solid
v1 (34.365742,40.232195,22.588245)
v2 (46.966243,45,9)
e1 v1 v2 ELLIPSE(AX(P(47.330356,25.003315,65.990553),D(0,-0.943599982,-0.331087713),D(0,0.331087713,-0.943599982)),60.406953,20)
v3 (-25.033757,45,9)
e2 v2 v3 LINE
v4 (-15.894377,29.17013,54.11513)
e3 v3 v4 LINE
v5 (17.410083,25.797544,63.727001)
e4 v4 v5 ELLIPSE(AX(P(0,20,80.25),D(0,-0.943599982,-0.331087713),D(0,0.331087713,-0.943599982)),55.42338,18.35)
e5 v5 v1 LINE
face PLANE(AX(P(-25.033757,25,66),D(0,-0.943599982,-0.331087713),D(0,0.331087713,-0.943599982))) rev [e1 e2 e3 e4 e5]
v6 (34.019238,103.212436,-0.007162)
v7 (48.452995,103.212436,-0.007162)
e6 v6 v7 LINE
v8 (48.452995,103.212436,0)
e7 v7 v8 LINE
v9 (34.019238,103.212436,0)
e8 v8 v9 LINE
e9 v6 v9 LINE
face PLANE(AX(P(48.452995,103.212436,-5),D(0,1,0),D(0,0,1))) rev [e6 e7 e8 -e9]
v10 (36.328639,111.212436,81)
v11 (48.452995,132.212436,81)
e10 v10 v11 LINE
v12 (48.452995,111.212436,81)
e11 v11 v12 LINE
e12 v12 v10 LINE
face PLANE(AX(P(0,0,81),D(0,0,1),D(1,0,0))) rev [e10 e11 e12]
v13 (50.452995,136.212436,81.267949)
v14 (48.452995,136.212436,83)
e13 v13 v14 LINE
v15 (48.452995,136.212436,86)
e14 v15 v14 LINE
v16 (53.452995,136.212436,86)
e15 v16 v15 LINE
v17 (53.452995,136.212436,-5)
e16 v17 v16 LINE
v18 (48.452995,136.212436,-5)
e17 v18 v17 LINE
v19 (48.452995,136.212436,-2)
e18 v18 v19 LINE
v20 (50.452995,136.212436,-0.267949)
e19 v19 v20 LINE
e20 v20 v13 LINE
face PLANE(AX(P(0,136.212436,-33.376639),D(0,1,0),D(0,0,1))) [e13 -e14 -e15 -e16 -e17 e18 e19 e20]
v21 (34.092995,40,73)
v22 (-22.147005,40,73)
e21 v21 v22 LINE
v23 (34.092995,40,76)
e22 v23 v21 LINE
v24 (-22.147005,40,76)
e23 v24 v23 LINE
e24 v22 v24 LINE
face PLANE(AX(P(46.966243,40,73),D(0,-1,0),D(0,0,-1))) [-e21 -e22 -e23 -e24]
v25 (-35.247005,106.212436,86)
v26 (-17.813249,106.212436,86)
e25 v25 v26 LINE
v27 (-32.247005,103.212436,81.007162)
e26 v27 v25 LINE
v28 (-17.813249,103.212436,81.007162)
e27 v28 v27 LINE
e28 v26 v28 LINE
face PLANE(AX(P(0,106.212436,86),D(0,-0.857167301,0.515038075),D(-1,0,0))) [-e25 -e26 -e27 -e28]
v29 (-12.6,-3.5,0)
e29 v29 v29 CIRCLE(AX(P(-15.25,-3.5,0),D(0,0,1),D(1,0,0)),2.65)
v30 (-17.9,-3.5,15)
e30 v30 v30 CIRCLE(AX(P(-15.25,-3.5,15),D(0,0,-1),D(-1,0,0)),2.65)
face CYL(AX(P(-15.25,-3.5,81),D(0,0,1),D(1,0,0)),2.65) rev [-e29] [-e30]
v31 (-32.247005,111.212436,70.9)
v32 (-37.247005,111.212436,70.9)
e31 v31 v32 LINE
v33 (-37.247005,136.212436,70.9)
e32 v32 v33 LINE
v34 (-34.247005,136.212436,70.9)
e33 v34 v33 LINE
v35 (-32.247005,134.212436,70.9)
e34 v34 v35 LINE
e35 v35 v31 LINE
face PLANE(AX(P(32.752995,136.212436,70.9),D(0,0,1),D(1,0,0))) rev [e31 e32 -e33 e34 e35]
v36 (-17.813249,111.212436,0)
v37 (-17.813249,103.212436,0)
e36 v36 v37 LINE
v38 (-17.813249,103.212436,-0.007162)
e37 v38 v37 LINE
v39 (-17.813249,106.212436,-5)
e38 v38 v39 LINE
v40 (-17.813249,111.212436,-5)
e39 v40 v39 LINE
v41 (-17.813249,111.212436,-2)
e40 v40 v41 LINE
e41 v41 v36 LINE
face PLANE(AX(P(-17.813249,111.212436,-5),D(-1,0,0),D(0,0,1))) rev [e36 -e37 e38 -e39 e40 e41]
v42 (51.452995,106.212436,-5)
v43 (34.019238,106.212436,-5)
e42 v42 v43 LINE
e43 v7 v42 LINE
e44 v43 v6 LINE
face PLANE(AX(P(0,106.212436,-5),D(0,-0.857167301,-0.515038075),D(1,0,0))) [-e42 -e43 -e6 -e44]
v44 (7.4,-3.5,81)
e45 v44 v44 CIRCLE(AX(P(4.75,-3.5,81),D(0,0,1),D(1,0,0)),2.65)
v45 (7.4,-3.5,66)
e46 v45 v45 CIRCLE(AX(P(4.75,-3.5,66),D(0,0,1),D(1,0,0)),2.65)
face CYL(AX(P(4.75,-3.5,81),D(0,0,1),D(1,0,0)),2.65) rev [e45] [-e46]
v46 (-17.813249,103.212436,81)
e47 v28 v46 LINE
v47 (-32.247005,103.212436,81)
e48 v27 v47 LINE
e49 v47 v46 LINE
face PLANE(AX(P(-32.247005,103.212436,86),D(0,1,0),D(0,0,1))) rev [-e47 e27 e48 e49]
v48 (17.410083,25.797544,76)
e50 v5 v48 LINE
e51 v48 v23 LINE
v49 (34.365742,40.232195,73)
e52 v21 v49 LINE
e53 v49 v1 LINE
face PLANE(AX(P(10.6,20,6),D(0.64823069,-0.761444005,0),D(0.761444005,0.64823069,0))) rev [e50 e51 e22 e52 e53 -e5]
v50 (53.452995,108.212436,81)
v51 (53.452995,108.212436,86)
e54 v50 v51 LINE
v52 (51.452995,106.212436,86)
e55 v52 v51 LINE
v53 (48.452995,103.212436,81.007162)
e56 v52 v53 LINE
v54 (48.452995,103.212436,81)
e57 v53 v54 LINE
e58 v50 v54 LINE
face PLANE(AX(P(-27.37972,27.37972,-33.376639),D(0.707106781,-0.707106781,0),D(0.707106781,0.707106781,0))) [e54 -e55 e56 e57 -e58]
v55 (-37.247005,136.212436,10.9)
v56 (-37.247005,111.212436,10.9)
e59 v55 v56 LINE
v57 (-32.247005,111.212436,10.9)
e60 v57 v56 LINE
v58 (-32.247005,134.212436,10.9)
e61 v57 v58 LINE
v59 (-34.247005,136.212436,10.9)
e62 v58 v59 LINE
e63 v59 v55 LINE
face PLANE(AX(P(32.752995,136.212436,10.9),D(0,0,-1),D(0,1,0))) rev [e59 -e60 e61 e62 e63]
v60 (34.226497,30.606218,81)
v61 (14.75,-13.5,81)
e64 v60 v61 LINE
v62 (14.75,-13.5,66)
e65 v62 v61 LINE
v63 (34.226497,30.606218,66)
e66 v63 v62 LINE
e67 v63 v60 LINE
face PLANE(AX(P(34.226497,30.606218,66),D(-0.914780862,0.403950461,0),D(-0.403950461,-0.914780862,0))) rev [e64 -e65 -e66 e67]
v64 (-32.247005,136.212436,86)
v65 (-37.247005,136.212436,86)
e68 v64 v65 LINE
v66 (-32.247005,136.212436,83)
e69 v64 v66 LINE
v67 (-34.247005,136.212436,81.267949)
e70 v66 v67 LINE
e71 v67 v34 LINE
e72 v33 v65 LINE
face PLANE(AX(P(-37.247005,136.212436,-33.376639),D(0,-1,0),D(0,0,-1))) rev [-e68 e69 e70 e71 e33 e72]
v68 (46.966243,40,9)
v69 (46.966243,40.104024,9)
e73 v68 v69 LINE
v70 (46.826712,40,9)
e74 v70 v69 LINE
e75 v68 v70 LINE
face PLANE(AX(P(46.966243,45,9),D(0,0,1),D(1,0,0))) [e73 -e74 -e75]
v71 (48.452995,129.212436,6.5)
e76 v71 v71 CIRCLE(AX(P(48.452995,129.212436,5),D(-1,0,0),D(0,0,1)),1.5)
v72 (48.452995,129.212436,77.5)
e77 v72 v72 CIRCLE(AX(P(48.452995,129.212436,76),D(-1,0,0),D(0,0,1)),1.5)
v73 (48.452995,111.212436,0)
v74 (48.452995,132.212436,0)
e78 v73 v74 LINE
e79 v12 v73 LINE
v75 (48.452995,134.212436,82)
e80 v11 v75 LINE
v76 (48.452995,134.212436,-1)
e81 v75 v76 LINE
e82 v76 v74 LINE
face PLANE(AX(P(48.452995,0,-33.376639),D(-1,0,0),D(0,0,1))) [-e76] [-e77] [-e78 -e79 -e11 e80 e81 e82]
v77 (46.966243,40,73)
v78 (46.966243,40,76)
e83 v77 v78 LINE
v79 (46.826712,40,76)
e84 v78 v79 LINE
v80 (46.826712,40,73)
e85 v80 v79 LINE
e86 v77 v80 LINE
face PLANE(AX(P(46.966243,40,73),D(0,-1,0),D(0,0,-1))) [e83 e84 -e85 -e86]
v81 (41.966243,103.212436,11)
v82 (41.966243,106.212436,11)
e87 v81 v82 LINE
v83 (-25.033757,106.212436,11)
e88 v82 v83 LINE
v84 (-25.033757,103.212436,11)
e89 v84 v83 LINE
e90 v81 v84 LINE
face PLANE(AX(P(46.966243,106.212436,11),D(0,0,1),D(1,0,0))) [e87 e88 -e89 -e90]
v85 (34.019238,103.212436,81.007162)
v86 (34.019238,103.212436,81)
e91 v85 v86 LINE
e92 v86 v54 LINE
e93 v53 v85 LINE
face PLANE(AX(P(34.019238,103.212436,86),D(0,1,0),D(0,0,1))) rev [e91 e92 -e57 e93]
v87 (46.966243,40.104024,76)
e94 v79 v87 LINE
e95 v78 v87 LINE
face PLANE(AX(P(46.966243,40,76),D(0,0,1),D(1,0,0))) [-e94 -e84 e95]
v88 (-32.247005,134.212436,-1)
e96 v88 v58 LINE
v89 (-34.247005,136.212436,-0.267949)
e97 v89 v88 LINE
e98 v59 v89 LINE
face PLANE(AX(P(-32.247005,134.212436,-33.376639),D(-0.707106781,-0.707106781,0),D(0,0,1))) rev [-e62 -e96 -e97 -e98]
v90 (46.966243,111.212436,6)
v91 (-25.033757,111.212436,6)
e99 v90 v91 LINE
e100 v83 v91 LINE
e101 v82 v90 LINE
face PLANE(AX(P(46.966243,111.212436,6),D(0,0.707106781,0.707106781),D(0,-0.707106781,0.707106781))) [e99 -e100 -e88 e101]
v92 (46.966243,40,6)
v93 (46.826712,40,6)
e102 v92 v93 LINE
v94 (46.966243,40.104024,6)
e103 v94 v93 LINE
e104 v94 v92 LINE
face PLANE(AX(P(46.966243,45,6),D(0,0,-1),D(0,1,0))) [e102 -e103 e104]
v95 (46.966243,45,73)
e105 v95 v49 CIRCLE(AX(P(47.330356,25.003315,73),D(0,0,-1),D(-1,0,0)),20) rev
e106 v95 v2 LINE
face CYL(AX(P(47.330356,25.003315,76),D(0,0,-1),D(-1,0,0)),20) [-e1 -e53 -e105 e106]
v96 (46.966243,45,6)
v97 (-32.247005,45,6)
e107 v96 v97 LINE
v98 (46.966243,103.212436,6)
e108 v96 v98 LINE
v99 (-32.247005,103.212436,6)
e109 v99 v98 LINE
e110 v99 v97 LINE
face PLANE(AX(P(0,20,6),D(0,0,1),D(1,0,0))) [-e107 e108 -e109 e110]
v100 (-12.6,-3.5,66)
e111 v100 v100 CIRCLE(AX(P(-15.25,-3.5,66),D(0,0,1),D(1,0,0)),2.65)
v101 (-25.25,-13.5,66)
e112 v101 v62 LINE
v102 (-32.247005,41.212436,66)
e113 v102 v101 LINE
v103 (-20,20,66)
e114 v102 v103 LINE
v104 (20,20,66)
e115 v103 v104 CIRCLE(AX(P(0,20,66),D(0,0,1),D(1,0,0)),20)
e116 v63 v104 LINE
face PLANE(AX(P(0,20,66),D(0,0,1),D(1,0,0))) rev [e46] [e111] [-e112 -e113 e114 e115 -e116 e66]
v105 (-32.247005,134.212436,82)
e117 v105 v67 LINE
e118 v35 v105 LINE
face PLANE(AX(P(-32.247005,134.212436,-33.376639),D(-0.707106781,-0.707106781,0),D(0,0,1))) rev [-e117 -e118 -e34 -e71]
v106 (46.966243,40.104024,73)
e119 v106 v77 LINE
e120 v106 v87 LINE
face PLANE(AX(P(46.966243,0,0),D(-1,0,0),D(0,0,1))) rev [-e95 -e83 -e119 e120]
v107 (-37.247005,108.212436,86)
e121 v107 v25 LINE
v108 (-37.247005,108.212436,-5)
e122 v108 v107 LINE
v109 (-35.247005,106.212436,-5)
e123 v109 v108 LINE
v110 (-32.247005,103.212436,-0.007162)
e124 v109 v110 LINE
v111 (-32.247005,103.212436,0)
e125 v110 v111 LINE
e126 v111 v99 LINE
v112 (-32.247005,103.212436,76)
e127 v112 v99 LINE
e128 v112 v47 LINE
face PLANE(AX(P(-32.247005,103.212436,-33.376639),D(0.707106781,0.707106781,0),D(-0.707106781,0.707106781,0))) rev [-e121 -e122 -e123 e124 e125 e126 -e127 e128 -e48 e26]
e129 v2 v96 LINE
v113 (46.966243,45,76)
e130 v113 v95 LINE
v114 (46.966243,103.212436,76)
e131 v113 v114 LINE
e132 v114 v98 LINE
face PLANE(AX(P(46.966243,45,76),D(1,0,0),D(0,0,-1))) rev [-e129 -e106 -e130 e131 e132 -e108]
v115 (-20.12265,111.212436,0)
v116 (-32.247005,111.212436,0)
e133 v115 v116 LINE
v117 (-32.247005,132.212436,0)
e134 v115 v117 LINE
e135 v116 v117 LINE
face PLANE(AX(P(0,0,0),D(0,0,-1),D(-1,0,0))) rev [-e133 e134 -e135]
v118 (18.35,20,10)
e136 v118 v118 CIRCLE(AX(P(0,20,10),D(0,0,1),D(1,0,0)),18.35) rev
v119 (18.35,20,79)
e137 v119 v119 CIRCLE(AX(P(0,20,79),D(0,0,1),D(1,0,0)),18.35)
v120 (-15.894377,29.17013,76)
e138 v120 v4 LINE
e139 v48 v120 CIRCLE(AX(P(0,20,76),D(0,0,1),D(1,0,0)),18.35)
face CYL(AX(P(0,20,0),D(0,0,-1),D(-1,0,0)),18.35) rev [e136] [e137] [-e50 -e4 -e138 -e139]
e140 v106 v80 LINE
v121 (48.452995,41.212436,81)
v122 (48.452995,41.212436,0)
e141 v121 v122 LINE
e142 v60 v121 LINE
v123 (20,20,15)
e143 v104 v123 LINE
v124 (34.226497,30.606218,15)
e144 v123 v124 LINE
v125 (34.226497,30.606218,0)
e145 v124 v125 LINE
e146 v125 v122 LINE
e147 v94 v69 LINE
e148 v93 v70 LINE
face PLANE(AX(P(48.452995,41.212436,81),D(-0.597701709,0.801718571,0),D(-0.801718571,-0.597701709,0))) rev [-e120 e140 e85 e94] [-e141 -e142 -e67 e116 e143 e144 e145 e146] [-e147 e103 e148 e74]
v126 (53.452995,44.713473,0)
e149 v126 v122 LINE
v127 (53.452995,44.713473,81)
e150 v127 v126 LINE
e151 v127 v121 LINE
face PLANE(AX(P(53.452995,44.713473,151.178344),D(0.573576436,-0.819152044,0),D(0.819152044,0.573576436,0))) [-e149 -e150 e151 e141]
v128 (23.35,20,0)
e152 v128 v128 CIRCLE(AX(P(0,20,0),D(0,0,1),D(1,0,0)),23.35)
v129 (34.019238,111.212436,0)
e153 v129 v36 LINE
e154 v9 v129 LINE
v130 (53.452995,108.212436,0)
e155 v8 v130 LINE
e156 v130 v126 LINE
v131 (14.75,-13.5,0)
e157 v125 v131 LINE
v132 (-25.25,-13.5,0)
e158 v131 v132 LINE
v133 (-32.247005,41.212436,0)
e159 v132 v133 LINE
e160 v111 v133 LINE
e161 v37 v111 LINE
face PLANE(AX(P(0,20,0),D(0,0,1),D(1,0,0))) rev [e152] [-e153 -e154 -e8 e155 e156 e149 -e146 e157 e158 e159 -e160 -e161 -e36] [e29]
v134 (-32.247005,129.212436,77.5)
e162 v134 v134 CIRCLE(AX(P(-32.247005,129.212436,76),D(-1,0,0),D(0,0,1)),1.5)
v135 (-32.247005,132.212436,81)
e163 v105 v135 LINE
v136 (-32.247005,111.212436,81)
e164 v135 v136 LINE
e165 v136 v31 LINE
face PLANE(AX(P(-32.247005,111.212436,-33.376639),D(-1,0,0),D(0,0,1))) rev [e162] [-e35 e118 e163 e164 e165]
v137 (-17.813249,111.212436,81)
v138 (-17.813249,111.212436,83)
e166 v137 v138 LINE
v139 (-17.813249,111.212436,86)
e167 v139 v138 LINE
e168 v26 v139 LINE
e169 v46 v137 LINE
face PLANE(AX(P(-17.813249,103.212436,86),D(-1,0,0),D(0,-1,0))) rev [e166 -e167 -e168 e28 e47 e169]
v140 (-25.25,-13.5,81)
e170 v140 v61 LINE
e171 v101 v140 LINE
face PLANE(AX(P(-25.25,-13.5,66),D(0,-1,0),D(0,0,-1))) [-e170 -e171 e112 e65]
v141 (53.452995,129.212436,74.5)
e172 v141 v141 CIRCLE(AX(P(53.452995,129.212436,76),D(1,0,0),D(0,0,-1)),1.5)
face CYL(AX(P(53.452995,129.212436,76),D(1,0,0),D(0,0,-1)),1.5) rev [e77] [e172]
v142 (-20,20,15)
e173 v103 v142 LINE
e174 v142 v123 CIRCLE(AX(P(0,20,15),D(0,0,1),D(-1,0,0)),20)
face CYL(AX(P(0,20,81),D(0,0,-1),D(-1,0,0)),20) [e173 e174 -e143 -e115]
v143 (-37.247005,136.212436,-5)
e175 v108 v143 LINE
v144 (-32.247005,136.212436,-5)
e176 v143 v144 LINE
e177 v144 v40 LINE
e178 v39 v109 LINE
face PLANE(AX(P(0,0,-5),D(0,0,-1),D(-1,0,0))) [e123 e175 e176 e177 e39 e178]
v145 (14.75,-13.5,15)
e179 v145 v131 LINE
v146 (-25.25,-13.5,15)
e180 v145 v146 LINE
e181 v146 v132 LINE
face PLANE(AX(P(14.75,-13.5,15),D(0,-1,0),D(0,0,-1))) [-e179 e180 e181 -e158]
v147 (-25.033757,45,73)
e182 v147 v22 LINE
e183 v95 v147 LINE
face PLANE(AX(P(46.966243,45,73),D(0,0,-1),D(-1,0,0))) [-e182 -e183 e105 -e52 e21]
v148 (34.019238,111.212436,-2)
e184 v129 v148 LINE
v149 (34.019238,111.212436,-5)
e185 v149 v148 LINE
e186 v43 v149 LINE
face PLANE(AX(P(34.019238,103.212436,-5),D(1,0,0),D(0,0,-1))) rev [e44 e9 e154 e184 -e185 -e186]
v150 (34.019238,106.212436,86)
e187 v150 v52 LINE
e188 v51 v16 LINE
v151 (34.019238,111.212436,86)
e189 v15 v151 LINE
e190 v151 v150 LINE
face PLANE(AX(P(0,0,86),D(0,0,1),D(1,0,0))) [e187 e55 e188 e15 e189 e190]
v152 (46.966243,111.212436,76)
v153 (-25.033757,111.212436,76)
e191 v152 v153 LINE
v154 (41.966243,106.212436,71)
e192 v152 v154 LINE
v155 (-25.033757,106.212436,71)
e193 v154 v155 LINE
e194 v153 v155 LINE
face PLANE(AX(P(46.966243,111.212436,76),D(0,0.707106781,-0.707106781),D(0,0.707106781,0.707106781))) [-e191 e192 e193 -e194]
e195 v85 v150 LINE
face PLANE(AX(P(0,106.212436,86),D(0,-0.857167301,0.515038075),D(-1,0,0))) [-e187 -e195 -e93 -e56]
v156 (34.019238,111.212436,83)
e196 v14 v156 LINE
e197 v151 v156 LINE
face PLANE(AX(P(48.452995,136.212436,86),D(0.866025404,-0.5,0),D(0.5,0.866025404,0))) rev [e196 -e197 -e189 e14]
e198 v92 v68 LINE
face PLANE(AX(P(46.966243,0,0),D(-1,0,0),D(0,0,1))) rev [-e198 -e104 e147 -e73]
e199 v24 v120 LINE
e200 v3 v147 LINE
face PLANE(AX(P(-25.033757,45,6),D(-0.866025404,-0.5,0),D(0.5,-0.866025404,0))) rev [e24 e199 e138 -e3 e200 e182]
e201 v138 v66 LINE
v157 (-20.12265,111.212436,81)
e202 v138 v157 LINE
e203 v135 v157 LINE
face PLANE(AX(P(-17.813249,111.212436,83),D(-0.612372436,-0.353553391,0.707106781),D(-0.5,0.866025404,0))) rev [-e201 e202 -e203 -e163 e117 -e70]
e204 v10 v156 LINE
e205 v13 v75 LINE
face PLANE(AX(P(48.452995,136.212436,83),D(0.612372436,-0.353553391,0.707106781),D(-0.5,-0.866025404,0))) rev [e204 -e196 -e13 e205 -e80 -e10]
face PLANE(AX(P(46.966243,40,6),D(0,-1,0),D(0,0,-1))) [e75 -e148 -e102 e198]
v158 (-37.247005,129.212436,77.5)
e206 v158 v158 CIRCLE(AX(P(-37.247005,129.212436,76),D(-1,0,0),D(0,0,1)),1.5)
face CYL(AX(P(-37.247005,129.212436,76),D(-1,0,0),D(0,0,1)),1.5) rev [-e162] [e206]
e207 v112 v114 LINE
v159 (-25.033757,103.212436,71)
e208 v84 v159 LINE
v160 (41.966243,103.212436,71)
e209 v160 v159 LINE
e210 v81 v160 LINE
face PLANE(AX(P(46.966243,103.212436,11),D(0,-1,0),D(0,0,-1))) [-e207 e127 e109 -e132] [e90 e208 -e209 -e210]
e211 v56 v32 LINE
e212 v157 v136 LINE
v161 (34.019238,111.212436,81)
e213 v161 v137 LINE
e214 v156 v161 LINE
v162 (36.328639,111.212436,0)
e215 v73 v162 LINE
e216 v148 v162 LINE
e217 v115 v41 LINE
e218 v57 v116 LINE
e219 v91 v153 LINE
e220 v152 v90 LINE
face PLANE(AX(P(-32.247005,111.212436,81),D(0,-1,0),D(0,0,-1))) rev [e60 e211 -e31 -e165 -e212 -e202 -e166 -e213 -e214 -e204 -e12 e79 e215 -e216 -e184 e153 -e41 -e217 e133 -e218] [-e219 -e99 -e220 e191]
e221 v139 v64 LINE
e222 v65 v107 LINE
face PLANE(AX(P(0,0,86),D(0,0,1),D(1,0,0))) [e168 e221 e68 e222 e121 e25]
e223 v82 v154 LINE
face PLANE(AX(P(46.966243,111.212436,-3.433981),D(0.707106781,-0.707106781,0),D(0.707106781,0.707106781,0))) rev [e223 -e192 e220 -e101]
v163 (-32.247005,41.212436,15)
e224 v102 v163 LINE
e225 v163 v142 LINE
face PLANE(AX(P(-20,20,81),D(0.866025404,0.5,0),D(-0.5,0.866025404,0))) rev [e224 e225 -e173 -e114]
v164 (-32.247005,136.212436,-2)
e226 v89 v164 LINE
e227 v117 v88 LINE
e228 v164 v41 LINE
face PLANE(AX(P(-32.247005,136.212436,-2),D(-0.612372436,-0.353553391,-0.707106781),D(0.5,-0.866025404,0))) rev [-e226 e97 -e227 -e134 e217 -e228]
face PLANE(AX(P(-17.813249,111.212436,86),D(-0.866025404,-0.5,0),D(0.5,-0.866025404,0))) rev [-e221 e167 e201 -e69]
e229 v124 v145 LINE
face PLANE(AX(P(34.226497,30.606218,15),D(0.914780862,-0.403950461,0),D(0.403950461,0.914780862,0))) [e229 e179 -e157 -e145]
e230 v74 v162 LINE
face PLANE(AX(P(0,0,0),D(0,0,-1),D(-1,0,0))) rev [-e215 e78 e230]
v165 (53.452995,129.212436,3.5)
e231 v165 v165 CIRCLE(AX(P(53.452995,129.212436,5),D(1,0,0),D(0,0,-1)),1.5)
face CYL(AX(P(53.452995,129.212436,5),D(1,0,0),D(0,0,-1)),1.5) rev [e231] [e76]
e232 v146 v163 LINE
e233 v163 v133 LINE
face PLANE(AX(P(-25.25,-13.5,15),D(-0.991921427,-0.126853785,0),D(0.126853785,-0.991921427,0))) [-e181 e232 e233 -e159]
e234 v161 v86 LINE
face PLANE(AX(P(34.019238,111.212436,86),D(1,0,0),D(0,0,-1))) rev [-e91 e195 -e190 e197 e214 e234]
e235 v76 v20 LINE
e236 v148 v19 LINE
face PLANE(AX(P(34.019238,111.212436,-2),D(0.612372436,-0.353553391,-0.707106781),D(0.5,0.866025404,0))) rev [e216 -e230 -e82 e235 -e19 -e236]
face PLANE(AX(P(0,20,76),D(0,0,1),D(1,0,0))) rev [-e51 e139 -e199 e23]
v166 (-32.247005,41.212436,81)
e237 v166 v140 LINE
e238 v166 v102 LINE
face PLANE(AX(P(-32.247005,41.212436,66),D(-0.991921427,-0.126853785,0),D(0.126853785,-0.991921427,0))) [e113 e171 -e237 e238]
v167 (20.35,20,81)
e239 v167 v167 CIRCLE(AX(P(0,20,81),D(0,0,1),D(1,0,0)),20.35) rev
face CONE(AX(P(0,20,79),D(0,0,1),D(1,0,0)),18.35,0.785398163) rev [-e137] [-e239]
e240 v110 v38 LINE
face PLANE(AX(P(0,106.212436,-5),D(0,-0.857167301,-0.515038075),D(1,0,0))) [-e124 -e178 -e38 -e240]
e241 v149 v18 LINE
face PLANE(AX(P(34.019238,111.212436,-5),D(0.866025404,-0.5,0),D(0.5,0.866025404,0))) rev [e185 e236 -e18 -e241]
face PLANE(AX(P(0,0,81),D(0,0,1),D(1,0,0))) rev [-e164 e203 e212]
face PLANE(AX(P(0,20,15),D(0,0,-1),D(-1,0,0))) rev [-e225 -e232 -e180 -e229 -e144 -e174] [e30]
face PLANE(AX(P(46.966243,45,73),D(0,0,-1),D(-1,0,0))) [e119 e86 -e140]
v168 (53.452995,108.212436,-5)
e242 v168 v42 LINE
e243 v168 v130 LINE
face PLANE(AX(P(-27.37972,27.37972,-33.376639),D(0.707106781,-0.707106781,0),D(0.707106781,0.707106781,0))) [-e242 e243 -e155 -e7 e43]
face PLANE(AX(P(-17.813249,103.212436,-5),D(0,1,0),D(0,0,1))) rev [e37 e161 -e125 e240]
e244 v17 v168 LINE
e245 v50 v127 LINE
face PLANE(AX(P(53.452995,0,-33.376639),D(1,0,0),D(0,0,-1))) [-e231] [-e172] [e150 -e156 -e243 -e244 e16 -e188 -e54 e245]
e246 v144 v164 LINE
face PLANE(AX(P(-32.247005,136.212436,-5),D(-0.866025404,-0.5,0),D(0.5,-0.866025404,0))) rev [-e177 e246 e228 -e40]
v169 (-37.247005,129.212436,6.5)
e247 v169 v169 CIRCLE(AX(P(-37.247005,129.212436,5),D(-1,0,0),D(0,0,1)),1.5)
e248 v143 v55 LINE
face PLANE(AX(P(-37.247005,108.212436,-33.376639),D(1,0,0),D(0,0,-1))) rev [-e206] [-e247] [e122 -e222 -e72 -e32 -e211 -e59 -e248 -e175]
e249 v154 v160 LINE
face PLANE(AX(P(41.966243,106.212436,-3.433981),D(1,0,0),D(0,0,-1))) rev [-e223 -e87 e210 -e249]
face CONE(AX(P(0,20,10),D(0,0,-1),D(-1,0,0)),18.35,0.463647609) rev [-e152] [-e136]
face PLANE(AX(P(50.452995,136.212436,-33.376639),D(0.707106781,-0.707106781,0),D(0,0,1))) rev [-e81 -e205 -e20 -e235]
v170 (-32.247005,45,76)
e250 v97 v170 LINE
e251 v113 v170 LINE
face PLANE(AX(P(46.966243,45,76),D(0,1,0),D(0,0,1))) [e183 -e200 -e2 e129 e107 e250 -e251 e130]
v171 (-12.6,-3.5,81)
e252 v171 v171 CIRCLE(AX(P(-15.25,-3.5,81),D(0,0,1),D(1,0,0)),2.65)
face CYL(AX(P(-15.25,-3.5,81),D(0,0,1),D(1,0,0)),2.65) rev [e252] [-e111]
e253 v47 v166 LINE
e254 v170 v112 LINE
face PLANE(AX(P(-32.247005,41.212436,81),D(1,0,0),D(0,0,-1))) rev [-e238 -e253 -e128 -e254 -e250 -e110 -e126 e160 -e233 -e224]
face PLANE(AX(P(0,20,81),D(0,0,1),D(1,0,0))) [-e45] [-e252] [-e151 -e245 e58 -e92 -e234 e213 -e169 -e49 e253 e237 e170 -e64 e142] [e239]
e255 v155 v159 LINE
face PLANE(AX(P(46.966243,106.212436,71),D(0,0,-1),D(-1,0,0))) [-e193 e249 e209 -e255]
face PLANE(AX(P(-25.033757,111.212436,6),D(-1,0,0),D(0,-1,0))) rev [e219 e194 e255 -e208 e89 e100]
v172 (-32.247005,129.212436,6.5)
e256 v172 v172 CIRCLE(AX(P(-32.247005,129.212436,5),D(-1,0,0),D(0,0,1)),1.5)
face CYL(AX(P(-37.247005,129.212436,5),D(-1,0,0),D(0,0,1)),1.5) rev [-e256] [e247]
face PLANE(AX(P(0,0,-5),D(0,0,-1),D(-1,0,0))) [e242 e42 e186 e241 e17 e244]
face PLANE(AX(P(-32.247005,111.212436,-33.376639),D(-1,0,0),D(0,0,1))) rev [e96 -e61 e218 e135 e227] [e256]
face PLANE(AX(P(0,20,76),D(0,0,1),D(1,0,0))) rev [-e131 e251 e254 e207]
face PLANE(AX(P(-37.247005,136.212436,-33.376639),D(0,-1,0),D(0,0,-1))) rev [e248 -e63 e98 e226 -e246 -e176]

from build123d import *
from OCP.BRepFilletAPI import BRepFilletAPI_MakeChamfer

# Parameters (mm, degrees)
AUFSATZ_LINEAR_AUSTRAGEN1_DEPTH      = 81
SCHNITT_LINEAR_START                 = -5
SCHNITT_LINEAR_AUSTRAGEN1_DEPTH      = 70
AUFSATZ_LINEAR_START                 = -7
SKIZZE7_W                            = 3
SKIZZE7_H                            = 5
AUFSATZ_LINEAR_AUSTRAGEN2_DEPTH      = 72
SCHNITT_LINEAR_AUSTRAGEN2_DEPTH      = 156.38326520426057
AUFSATZ_LINEAR_AUSTRAGEN16_REACH     = 147.866
AUFSATZ_LINEAR_AUSTRAGEN17_DEPTH     = 5
AUFSATZ_LINEAR_AUSTRAGEN18_DEPTH     = 5
F_3_0_3_DURCHMESSER_BOHRUNG1_D       = 3
F_3_0_3_DURCHMESSER_BOHRUNG1_DEPTH   = 5
AUFSATZ_LINEAR_AUSTRAGEN19_DEPTH     = 65
F_21_5_21_5_DURCHMESSER_BOHRUNG1_D   = 36.7
SCHNITT_LINEAR_AUSTRAGEN3_DEPTH      = 167.766454168909
FASE1_SIZE                           = 2
AUFSATZ_LINEAR_AUSTRAGEN20_REACH     = 178.15
FASE3_SIZE                           = 2
FASE4_SIZE                           = 2
AUFSATZ_LINEAR_AUSTRAGEN21_REACH     = 178.15
F_3_0_3_DURCHMESSER_BOHRUNG2_D       = 3
AUFSATZ_LINEAR_START_2               = -15
AUFSATZ_LINEAR_AUSTRAGEN22_DEPTH     = 15
AUFSATZ_LINEAR_AUSTRAGEN23_DEPTH     = 15
FASE5_SIZE                           = 3
FASE5_SIZE2                          = 4.992838447051577
F_5_3_5_3_DURCHMESSER_BOHRUNG1_D     = 5.3
F_5_3_5_3_DURCHMESSER_BOHRUNG2_D     = 5.3
F_5_3_5_3_DURCHMESSER_BOHRUNG2_DEPTH = 15
FASE6_SIZE                           = 2
FASE7_SIZE                           = 5
FASE7_SIZE2                          = 10
AUFSATZ_LINEAR_AUSTRAGEN24_DEPTH     = 81
SCHNITT_LINEAR_START_2               = -66.212436
SCHNITT_LINEAR_AUSTRAGEN4_DEPTH      = 66.212436
SCHNITT_LINEAR_AUSTRAGEN5_REACH      = 186.868
AUFSATZ_LINEAR_AUSTRAGEN25_DEPTH     = 7
AUFSATZ_LINEAR_AUSTRAGEN27_REACH     = 169.248
VERRUNDUNG1_R                        = 20


with BuildPart() as part:
    # Skizze1 → Aufsatz-Linear austragen1 (new body)
    with BuildSketch(Plane.XY):
        with BuildLine():
            Line((-20, 19.999999999999996), (-32.24700538379256, 41.212435565298236))
            Line((-32.24700538379256, 41.212435565298236), (-32.24700538379256, 111.21243556529824))
            Line((-32.24700538379256, 111.21243556529824), (48.45299461620745, 111.21243556529824))
            Line((48.45299461620745, 111.21243556529824), (48.45299461620745, 41.21243556529823))
            Line((48.45299461620745, 41.21243556529823), (20, 19.999999999999996))
            ThreePointArc((20, 19.999999999999996), (1.22e-15, 0), (-20, 19.999999999999996))
        make_face()
    extrude(amount=AUFSATZ_LINEAR_AUSTRAGEN1_DEPTH)

    # Skizze2 → Schnitt-Linear austragen1 (cut)
    with BuildSketch(Plane.XY.offset(81).offset(SCHNITT_LINEAR_START)):
        with BuildLine():
            Line((10.6, 19.999999999999993), (39.96624327025953, 45))
            Line((39.96624327025953, 45), (39.96624327025955, 111.21243556529822))
            Line((39.96624327025955, 111.21243556529822), (-25.033756729740457, 111.21243556529824))
            Line((-25.033756729740457, 111.21243556529824), (-25.03375672974045, 45))
            Line((-25.03375672974045, 45), (-10.6, 19.999999999999993))
            ThreePointArc((-10.6, 19.999999999999993), (-1.7e-15, 9.4), (10.6, 19.999999999999993))
        make_face()
    extrude(amount=-SCHNITT_LINEAR_AUSTRAGEN1_DEPTH, mode=Mode.SUBTRACT)

    # Skizze7 → Aufsatz-Linear austragen2 (add)
    with BuildSketch(Plane.ZY.offset(-39.966243270259525).offset(AUFSATZ_LINEAR_START)):
        Polygon((5.999999999999991, 111.21243556529824), (10.999999999999993, 106.21243556529822), (10.999999999999993, 103.21243556529822), (5.999999999999991, 103.21243556529822), align=None)
        Polygon((76, 111.21243556529824), (71, 106.21243556529825), (71, 103.21243556529825), (76, 103.21243556529825), align=None)
        with Locations((74.5, 42.50000000000001)):
            Rectangle(SKIZZE7_W, SKIZZE7_H)
        with Locations((7.499999999999991, 42.50000000000001)):
            Rectangle(SKIZZE7_W, SKIZZE7_H)
    extrude(amount=AUFSATZ_LINEAR_AUSTRAGEN2_DEPTH)

    # Skizze8 → Schnitt-Linear austragen2 (cut, through all)
    with BuildSketch(Plane.ZY.offset(-39.966243270259525)):
        Polygon((10.999999999999993, 103.21243556529822), (5.999999999999991, 103.21243556529825), (5.999999999999991, 45.00000000000001), (76, 45.00000000000001), (76, 103.21243556529825), (71, 103.21243556529825), align=None)
    extrude(amount=SCHNITT_LINEAR_AUSTRAGEN2_DEPTH, mode=Mode.SUBTRACT)

    # Aufsatz-Linear austragen16: up to this face of the body (flat: up to its plane)
    aufsatz_linear_austragen16_end = Plane(part.part.faces().sort_by_distance((6.820175039, 63.309969875, 0))[0])
    # Skizze12 → Aufsatz-Linear austragen16 (add, up to the picked face)
    with BuildSketch(Plane.XY.offset(81), mode=Mode.PRIVATE) as aufsatz_linear_austragen16_sk1:
        Polygon((48.45299461620745, 136.21243556529822), (48.45299461620745, 111.21243556529824), (48.45299461620745, 103.21243556529824), (53.45299461620744, 108.21243556529842), (53.45299461620744, 136.21243556529822), align=None)
    aufsatz_linear_austragen16_tool1 = split(extrude(aufsatz_linear_austragen16_sk1.sketch, amount=-AUFSATZ_LINEAR_AUSTRAGEN16_REACH, mode=Mode.PRIVATE), bisect_by=aufsatz_linear_austragen16_end, keep=Keep.BOTH, mode=Mode.PRIVATE)
    # Skizze12 → Aufsatz-Linear austragen16 (add, up to the picked face)
    with BuildSketch(Plane.XY.offset(81), mode=Mode.PRIVATE) as aufsatz_linear_austragen16_sk2:
        Polygon((-37.24700538379256, 136.21243556529825), (-32.24700538379256, 136.21243556529825), (-32.24700538379256, 111.21243556529824), (-32.24700538379256, 103.21243556529825), (-37.24700538379256, 108.21243556529829), align=None)
    aufsatz_linear_austragen16_tool2 = split(extrude(aufsatz_linear_austragen16_sk2.sketch, amount=-AUFSATZ_LINEAR_AUSTRAGEN16_REACH, mode=Mode.PRIVATE), bisect_by=aufsatz_linear_austragen16_end, keep=Keep.BOTH, mode=Mode.PRIVATE)
    add(aufsatz_linear_austragen16_tool1.solids().sort_by(Axis((50.884689, 120.928283, 81), (0, 0, -1)))[0])
    add(aufsatz_linear_austragen16_tool2.solids().sort_by(Axis((-34.678699, 120.928283, 81), (0, 0, -1)))[0])

    # Skizze13 → Aufsatz-Linear austragen17 (add)
    with BuildSketch(Plane(origin=(0, 0, 0), x_dir=(-1, 0, 0), z_dir=(0, 0, -1))):
        Polygon((37.24700538379256, 136.21243556529825), (32.24700538379256, 136.21243556529825), (17.813248654051872, 111.21243556529824), (17.813248654051872, 103.21243556529825), (32.24700538379256, 103.21243556529825), (37.24700538379256, 108.21243556529829), align=None)
        Polygon((-53.45299461620744, 136.21243556529822), (-53.45299461620745, 108.21243556529842), (-48.45299461620745, 103.21243556529824), (-34.01923788646676, 103.21243556529824), (-34.01923788646676, 111.21243556529824), (-48.45299461620745, 136.21243556529822), align=None)
    extrude(amount=AUFSATZ_LINEAR_AUSTRAGEN17_DEPTH)

    # Skizze14 → Aufsatz-Linear austragen18 (add)
    with BuildSketch(Plane.XY.offset(81)):
        Polygon((-32.24700538379256, 136.21243556529825), (-37.24700538379256, 136.21243556529825), (-37.24700538379256, 108.21243556529829), (-32.24700538379256, 103.21243556529825), (-17.813248654051876, 103.21243556529825), (-17.813248654051872, 111.21243556529824), align=None)
        Polygon((53.45299461620744, 136.21243556529822), (48.45299461620745, 136.21243556529822), (34.019237886466776, 111.21243556529824), (34.019237886466776, 103.21243556529824), (48.45299461620745, 103.21243556529824), (53.45299461620745, 108.21243556529842), align=None)
    extrude(amount=AUFSATZ_LINEAR_AUSTRAGEN18_DEPTH)

    # Ø3.0 (3) Durchmesser Bohrung1
    with Locations(Plane.ZY.offset(37.24700538379256)):
        with Locations((5, 129.212435565), (76, 129.212435565)):
            Hole(F_3_0_3_DURCHMESSER_BOHRUNG1_D / 2, depth=F_3_0_3_DURCHMESSER_BOHRUNG1_DEPTH)

    # Skizze21 → Aufsatz-Linear austragen19 (add)
    with BuildSketch(Plane.ZY.offset(-39.966243270259525)):
        Polygon((65.99999999999999, 20), (65.99999999999999, 25), (8.999999999999991, 45.00000000000001), (5.999999999999991, 45.00000000000001), (5.999999999999995, 20), align=None)
    extrude(amount=AUFSATZ_LINEAR_AUSTRAGEN19_DEPTH)

    # Ø21.5 (21.5) Durchmesser Bohrung1 (through all)
    with Locations(Plane(origin=(0, 0, 0), x_dir=(-1, 0, 0), z_dir=(0, 0, -1))):
        with Locations((0, 20)):
            Hole(F_21_5_21_5_DURCHMESSER_BOHRUNG1_D / 2)

    # Skizze22 → Schnitt-Linear austragen3 (cut, through all)
    with BuildSketch(Plane(origin=(0, 8.3e-16, 5.999999999999997), x_dir=(-1, 0, 0), z_dir=(0, -1.4e-16, -1))):
        Polygon((-39.966243270259525, 34.88534527083473), (-39.96624327025953, 19.999999999999996), (-20, 19.999999999999996), align=None)
        Polygon((20.000000000000004, 20), (25.033756729740453, 28.718722408852198), (25.033756729740453, 20), align=None)
    extrude(amount=-SCHNITT_LINEAR_AUSTRAGEN3_DEPTH, mode=Mode.SUBTRACT)

    # Fase1
    fase1_edges = [part.edges().sort_by_distance(p)[0] for p in [
        (-25.030127018922215, 123.71243556529825, 81),
        (-25.030127018922215, 123.71243556529825, 0),
    ]]
    chamfer(fase1_edges, length=FASE1_SIZE)

    # Skizze23 → Aufsatz-Linear austragen20 (add, up to next)
    with BuildSketch(Plane(origin=(-17.81324865405192, 7.73e-15, 0), x_dir=(0, 0, -1), z_dir=(1, 2.2e-16, 0)), mode=Mode.PRIVATE) as aufsatz_linear_austragen20_sk1:
        Polygon((-82.99999999999997, 111.21243556529822), (-81, 107.2124355652983), (-81, 111.21243556529822), align=None)
    aufsatz_linear_austragen20_tool1 = extrude(aufsatz_linear_austragen20_sk1.sketch, amount=-AUFSATZ_LINEAR_AUSTRAGEN20_REACH, mode=Mode.PRIVATE) - part.part
    # Skizze23 → Aufsatz-Linear austragen20 (add, up to next)
    with BuildSketch(Plane(origin=(-17.81324865405192, 7.73e-15, 0), x_dir=(0, 0, -1), z_dir=(1, 2.2e-16, 0)), mode=Mode.PRIVATE) as aufsatz_linear_austragen20_sk2:
        Polygon((-1.73e-15, 107.21243556529824), (2.000000000000009, 111.21243556529822), (-1.1e-16, 111.21243556529822), align=None)
    aufsatz_linear_austragen20_tool2 = extrude(aufsatz_linear_austragen20_sk2.sketch, amount=-AUFSATZ_LINEAR_AUSTRAGEN20_REACH, mode=Mode.PRIVATE) - part.part
    add(aufsatz_linear_austragen20_tool1.solids().sort_by_distance((-17.813249, 109.879102, 81.666667))[0])
    add(aufsatz_linear_austragen20_tool2.solids().sort_by_distance((-17.813249, 109.879102, -0.666667))[0])

    # Fase3
    fase3_edges = [part.edges().sort_by_distance(p)[0] for p in [
        (41.236116251337116, 123.71243556529822, 81),
        (41.23611625133711, 123.71243556529822, 0),
    ]]
    chamfer(fase3_edges, length=FASE3_SIZE)

    # Fase4
    fase4_edges = [part.edges().sort_by_distance(p)[0] for p in [
        (48.45299461620745, 136.21243556529822, 40.5),
        (-32.247005383792555, 136.21243556529825, 40.50000000000001),
    ]]
    chamfer(fase4_edges, length=FASE4_SIZE)

    # Skizze24 → Aufsatz-Linear austragen21 (add, up to next)
    with BuildSketch(Plane.ZY.offset(-34.01923788646676), mode=Mode.PRIVATE) as aufsatz_linear_austragen21_sk1:
        Polygon((-1.999999999999974, 111.21243556529824), (0, 107.2124355652983), (0, 111.21243556529824), align=None)
    aufsatz_linear_austragen21_tool1 = extrude(aufsatz_linear_austragen21_sk1.sketch, amount=-AUFSATZ_LINEAR_AUSTRAGEN21_REACH, mode=Mode.PRIVATE) - part.part
    # Skizze24 → Aufsatz-Linear austragen21 (add, up to next)
    with BuildSketch(Plane.ZY.offset(-34.01923788646676), mode=Mode.PRIVATE) as aufsatz_linear_austragen21_sk2:
        Polygon((83, 111.21243556529824), (80.31502577388078, 105.84248711305969), (80.31502577388078, 111.21243556529824), align=None)
    aufsatz_linear_austragen21_tool2 = extrude(aufsatz_linear_austragen21_sk2.sketch, amount=-AUFSATZ_LINEAR_AUSTRAGEN21_REACH, mode=Mode.PRIVATE) - part.part
    add(aufsatz_linear_austragen21_tool1.solids().sort_by_distance((34.019238, 109.879102, -0.666667))[0])
    add(aufsatz_linear_austragen21_tool2.solids().sort_by_distance((34.019238, 109.422453, 81.210017))[0])

    # Ø3.0 (3) Durchmesser Bohrung2 (through all)
    with Locations(Plane(origin=(53.45299461620744, 0, 0), x_dir=(0, 0, -1), z_dir=(1, 0, 0))):
        with Locations((-76, 129.212435565), (-5, 129.212435565)):
            Hole(F_3_0_3_DURCHMESSER_BOHRUNG2_D / 2)

    # Skizze30 → Aufsatz-Linear austragen22 (add)
    with BuildSketch(Plane.XY.offset(81).offset(AUFSATZ_LINEAR_START_2)):
        with BuildLine():
            Line((-25.25, -13.5), (14.750000000000002, -13.5))
            Line((14.750000000000002, -13.5), (34.226497308103724, 30.606217782649114))
            Line((34.226497308103724, 30.606217782649114), (20.000000000000004, 19.999999999999996))
            ThreePointArc((20.000000000000004, 19.999999999999996), (-3.67e-15, -3.55e-15), (-20, 19.999999999999996))
            Line((-20, 19.999999999999996), (-32.24700538379256, 41.212435565298236))
            Line((-32.24700538379256, 41.212435565298236), (-25.25, -13.5))
        make_face()
    extrude(amount=AUFSATZ_LINEAR_AUSTRAGEN22_DEPTH)

    # Skizze31 → Aufsatz-Linear austragen23 (add)
    with BuildSketch(Plane(origin=(0, 0, 0), x_dir=(-1, 0, 0), z_dir=(0, 0, -1))):
        with BuildLine():
            Line((-34.226497308103724, 30.606217782649114), (-20, 19.999999999999996))
            ThreePointArc((-20, 19.999999999999996), (-3.22e-15, 1.066e-14), (20, 19.999999999999996))
            Line((20, 19.999999999999996), (32.24700538379256, 41.212435565298236))
            Line((32.24700538379256, 41.212435565298236), (25.25, -13.5))
            Line((25.25, -13.5), (-14.749999999999998, -13.5))
            Line((-14.749999999999998, -13.5), (-34.226497308103724, 30.606217782649114))
        make_face()
    extrude(amount=-AUFSATZ_LINEAR_AUSTRAGEN23_DEPTH)

    # Fase5: one chamfer whose edges measure the first distance from different faces: ONE call of the kernel's chamfer builder (chamfer() names one face for all edges)
    fase5_edges_1 = [part.edges().sort_by_distance(p)[0] for p in [
        (41.23611625133711, 103.21243556529824, -5),
    ]]
    fase5_side_1 = [part.faces().sort_by_distance(p)[0] for p in [
        (45.48560109201637, 116.83988365625363, -5),
    ]]
    fase5_edges_2 = [part.edges().sort_by_distance(p)[0] for p in [
        (-25.030127018922215, 103.21243556529825, -5),
    ]]
    fase5_side_2 = [part.faces().sort_by_distance(p)[0] for p in [
        (-29.279611859601495, 116.83988365625365, -5),
    ]]
    fase5_edges_3 = [part.edges().sort_by_distance(p)[0] for p in [
        (-25.03012701892222, 103.21243556529825, 86),
    ]]
    fase5_side_3 = [part.faces().sort_by_distance(p)[0] for p in [
        (-29.279611859601484, 116.83988365625365, 86),
    ]]
    fase5_edges_4 = [part.edges().sort_by_distance(p)[0] for p in [
        (41.23611625133711, 103.21243556529824, 86),
    ]]
    fase5_side_4 = [part.faces().sort_by_distance(p)[0] for p in [
        (45.485601092016374, 116.83988365625362, 86),
    ]]
    fase5 = BRepFilletAPI_MakeChamfer(part.part.solid().wrapped)
    for e in fase5_edges_1:
        fase5.Add(FASE5_SIZE, FASE5_SIZE2, e.wrapped, fase5_side_1[0].wrapped)  # the first distance lies on this face
    for e in fase5_edges_2:
        fase5.Add(FASE5_SIZE, FASE5_SIZE2, e.wrapped, fase5_side_2[0].wrapped)  # the first distance lies on this face
    for e in fase5_edges_3:
        fase5.Add(FASE5_SIZE, FASE5_SIZE2, e.wrapped, fase5_side_3[0].wrapped)  # the first distance lies on this face
    for e in fase5_edges_4:
        fase5.Add(FASE5_SIZE, FASE5_SIZE2, e.wrapped, fase5_side_4[0].wrapped)  # the first distance lies on this face
    add(Compound.cast(fase5.Shape()), mode=Mode.REPLACE)

    # Ø5.3 (5.3) Durchmesser Bohrung1 (through all)
    with Locations(Plane.XY.offset(81)):
        with Locations((-15.25, -3.5)):
            Hole(F_5_3_5_3_DURCHMESSER_BOHRUNG1_D / 2)

    # Ø5.3 (5.3) Durchmesser Bohrung2
    with Locations(Plane.XY.offset(81)):
        with Locations((4.75, -3.5)):
            Hole(F_5_3_5_3_DURCHMESSER_BOHRUNG2_D / 2, depth=F_5_3_5_3_DURCHMESSER_BOHRUNG2_DEPTH)

    # Fase6
    fase6_edges = [part.edges().sort_by_distance(p)[0] for p in [
        (-18.35, 20.000000000000004, 81),
    ]]
    chamfer(fase6_edges, length=FASE6_SIZE)

    # Fase7
    fase7_edges = [part.edges().sort_by_distance(p)[0] for p in [
        (-18.35, 20.000000000000004, 0),
    ]]
    fase7_side = [part.faces().sort_by_distance(p)[0] for p in [
        (6.001968826777722, 58.75126670064612, 0),
    ]]
    chamfer(fase7_edges, length=FASE7_SIZE, length2=FASE7_SIZE2, reference=fase7_side[0])

    # Skizze39 → Aufsatz-Linear austragen24 (add)
    with BuildSketch(Plane(origin=(0, 0, 0), x_dir=(-1, 0, 0), z_dir=(0, 0, -1))):
        Polygon((-48.45299461620745, 103.21243556529824), (-48.45299461620745, 111.21243556529824), (-53.45299461620744, 111.21243556529824), (-53.452994616207434, 44.71347325634675), (-48.45299461620745, 41.21243556529823), align=None)
    extrude(amount=-AUFSATZ_LINEAR_AUSTRAGEN24_DEPTH)

    # Skizze40 → Schnitt-Linear austragen4 (cut)
    with BuildSketch(Plane(origin=(0, 111.21243556529824, 0), x_dir=(1, 0, 0), z_dir=(0, 1, 0)).offset(SCHNITT_LINEAR_START_2)):
        Polygon((39.96624327025955, -76), (39.96624327025955, -5.999999999999991), (46.966243270259525, -5.999999999999991), (46.96624327025955, -76), align=None)
    extrude(amount=SCHNITT_LINEAR_AUSTRAGEN4_DEPTH, mode=Mode.SUBTRACT)

    # Schnitt-Linear austragen5: up to this face of the body (flat: up to its plane)
    schnitt_linear_austragen5_end = Plane(part.part.faces().sort_by_distance((-32.247005384, 122.674493846, 40.5))[0])
    # Skizze44 → Schnitt-Linear austragen5 (cut, up to the picked face)
    with BuildSketch(Plane.ZY.offset(37.24700538379256), mode=Mode.PRIVATE) as schnitt_linear_austragen5_sk1:
        Polygon((10.900000000000007, 136.21243556529822), (10.900000000000011, 111.21243556529822), (70.9, 111.21243556529824), (70.9, 136.21243556529828), align=None)
    schnitt_linear_austragen5_tool1 = split(extrude(schnitt_linear_austragen5_sk1.sketch, amount=-SCHNITT_LINEAR_AUSTRAGEN5_REACH, mode=Mode.PRIVATE), bisect_by=schnitt_linear_austragen5_end, keep=Keep.BOTH, mode=Mode.PRIVATE)
    add(schnitt_linear_austragen5_tool1.solids().sort_by(Axis((-37.247005, 123.712436, 40.9), (1, 0, 0)))[0], mode=Mode.SUBTRACT)

    # Skizze41 → Aufsatz-Linear austragen25 (add)
    with BuildSketch(Plane(origin=(39.96624327025955, 0, 0), x_dir=(0, 0, -1), z_dir=(1, 0, 0))):
        Polygon((-71, 106.21243556529824), (-76, 111.21243556529824), (-76, 103.21243556529824), (-71, 103.21243556529824), align=None)
        Polygon((-5.999999999999991, 103.21243556529821), (-5.999999999999991, 111.21243556529824), (-10.999999999999993, 106.21243556529821), (-10.999999999999993, 103.21243556529821), align=None)
    extrude(amount=AUFSATZ_LINEAR_AUSTRAGEN25_DEPTH)

    # Aufsatz-Linear austragen27: up to this face of the body (flat: up to its plane)
    aufsatz_linear_austragen27_end = Plane(part.part.faces().sort_by_distance((7.359618967, 74.106217763, 6))[0])
    # Skizze46 → Aufsatz-Linear austragen27 (add, up to the picked face)
    with BuildSketch(Plane(origin=(0, 0, 76), x_dir=(-1, 0, 0), z_dir=(0, 0, -1)), mode=Mode.PRIVATE) as aufsatz_linear_austragen27_sk1:
        Polygon((-46.96624327025955, 111.21243556529824), (-41.96624327025953, 106.21243556529825), (-41.96624327025953, 103.21243556529825), (-46.96624327025955, 103.21243556529825), align=None)
    aufsatz_linear_austragen27_tool1 = split(extrude(aufsatz_linear_austragen27_sk1.sketch, amount=AUFSATZ_LINEAR_AUSTRAGEN27_REACH, mode=Mode.PRIVATE), bisect_by=aufsatz_linear_austragen27_end, keep=Keep.BOTH, mode=Mode.PRIVATE)
    add(aufsatz_linear_austragen27_tool1.solids().sort_by(Axis((44.845031, 106.15183, 76), (0, 0, -1)))[0])

    # Verrundung1
    # the kernel refuses this fillet: 20 mm, written as the material it takes off along each edge
    with BuildSketch(Plane(origin=(39.96624327025953, 45, 73), x_dir=(0.9999999999999981, -6.2100252559308e-08, 0), z_dir=(0, 0, -1))) as verrundung1_piece_1_section:
        with BuildLine():
            CenterArc((7.364113453491243, 19.99668526013716), VERRUNDUNG1_R, 229.59166053400796, 39.36517362751647)
            Line((-5.600501285825948, 4.767805962530279), (0, 0))
            Line((0, 0), (7.0000000000000275, 0))
        make_face()
    verrundung1_piece_1 = extrude(amount=82.387765692995, mode=Mode.PRIVATE)
    verrundung1_piece_1 = split(verrundung1_piece_1, bisect_by=Plane(origin=(40.238295620402674, 34.86532480900939, 37.883824294323226), z_dir=(0, 0.9435999821328808, 0.33108771302908113)), keep=Keep.TOP, mode=Mode.PRIVATE)
    add(verrundung1_piece_1, mode=Mode.SUBTRACT)


solid = part.part
